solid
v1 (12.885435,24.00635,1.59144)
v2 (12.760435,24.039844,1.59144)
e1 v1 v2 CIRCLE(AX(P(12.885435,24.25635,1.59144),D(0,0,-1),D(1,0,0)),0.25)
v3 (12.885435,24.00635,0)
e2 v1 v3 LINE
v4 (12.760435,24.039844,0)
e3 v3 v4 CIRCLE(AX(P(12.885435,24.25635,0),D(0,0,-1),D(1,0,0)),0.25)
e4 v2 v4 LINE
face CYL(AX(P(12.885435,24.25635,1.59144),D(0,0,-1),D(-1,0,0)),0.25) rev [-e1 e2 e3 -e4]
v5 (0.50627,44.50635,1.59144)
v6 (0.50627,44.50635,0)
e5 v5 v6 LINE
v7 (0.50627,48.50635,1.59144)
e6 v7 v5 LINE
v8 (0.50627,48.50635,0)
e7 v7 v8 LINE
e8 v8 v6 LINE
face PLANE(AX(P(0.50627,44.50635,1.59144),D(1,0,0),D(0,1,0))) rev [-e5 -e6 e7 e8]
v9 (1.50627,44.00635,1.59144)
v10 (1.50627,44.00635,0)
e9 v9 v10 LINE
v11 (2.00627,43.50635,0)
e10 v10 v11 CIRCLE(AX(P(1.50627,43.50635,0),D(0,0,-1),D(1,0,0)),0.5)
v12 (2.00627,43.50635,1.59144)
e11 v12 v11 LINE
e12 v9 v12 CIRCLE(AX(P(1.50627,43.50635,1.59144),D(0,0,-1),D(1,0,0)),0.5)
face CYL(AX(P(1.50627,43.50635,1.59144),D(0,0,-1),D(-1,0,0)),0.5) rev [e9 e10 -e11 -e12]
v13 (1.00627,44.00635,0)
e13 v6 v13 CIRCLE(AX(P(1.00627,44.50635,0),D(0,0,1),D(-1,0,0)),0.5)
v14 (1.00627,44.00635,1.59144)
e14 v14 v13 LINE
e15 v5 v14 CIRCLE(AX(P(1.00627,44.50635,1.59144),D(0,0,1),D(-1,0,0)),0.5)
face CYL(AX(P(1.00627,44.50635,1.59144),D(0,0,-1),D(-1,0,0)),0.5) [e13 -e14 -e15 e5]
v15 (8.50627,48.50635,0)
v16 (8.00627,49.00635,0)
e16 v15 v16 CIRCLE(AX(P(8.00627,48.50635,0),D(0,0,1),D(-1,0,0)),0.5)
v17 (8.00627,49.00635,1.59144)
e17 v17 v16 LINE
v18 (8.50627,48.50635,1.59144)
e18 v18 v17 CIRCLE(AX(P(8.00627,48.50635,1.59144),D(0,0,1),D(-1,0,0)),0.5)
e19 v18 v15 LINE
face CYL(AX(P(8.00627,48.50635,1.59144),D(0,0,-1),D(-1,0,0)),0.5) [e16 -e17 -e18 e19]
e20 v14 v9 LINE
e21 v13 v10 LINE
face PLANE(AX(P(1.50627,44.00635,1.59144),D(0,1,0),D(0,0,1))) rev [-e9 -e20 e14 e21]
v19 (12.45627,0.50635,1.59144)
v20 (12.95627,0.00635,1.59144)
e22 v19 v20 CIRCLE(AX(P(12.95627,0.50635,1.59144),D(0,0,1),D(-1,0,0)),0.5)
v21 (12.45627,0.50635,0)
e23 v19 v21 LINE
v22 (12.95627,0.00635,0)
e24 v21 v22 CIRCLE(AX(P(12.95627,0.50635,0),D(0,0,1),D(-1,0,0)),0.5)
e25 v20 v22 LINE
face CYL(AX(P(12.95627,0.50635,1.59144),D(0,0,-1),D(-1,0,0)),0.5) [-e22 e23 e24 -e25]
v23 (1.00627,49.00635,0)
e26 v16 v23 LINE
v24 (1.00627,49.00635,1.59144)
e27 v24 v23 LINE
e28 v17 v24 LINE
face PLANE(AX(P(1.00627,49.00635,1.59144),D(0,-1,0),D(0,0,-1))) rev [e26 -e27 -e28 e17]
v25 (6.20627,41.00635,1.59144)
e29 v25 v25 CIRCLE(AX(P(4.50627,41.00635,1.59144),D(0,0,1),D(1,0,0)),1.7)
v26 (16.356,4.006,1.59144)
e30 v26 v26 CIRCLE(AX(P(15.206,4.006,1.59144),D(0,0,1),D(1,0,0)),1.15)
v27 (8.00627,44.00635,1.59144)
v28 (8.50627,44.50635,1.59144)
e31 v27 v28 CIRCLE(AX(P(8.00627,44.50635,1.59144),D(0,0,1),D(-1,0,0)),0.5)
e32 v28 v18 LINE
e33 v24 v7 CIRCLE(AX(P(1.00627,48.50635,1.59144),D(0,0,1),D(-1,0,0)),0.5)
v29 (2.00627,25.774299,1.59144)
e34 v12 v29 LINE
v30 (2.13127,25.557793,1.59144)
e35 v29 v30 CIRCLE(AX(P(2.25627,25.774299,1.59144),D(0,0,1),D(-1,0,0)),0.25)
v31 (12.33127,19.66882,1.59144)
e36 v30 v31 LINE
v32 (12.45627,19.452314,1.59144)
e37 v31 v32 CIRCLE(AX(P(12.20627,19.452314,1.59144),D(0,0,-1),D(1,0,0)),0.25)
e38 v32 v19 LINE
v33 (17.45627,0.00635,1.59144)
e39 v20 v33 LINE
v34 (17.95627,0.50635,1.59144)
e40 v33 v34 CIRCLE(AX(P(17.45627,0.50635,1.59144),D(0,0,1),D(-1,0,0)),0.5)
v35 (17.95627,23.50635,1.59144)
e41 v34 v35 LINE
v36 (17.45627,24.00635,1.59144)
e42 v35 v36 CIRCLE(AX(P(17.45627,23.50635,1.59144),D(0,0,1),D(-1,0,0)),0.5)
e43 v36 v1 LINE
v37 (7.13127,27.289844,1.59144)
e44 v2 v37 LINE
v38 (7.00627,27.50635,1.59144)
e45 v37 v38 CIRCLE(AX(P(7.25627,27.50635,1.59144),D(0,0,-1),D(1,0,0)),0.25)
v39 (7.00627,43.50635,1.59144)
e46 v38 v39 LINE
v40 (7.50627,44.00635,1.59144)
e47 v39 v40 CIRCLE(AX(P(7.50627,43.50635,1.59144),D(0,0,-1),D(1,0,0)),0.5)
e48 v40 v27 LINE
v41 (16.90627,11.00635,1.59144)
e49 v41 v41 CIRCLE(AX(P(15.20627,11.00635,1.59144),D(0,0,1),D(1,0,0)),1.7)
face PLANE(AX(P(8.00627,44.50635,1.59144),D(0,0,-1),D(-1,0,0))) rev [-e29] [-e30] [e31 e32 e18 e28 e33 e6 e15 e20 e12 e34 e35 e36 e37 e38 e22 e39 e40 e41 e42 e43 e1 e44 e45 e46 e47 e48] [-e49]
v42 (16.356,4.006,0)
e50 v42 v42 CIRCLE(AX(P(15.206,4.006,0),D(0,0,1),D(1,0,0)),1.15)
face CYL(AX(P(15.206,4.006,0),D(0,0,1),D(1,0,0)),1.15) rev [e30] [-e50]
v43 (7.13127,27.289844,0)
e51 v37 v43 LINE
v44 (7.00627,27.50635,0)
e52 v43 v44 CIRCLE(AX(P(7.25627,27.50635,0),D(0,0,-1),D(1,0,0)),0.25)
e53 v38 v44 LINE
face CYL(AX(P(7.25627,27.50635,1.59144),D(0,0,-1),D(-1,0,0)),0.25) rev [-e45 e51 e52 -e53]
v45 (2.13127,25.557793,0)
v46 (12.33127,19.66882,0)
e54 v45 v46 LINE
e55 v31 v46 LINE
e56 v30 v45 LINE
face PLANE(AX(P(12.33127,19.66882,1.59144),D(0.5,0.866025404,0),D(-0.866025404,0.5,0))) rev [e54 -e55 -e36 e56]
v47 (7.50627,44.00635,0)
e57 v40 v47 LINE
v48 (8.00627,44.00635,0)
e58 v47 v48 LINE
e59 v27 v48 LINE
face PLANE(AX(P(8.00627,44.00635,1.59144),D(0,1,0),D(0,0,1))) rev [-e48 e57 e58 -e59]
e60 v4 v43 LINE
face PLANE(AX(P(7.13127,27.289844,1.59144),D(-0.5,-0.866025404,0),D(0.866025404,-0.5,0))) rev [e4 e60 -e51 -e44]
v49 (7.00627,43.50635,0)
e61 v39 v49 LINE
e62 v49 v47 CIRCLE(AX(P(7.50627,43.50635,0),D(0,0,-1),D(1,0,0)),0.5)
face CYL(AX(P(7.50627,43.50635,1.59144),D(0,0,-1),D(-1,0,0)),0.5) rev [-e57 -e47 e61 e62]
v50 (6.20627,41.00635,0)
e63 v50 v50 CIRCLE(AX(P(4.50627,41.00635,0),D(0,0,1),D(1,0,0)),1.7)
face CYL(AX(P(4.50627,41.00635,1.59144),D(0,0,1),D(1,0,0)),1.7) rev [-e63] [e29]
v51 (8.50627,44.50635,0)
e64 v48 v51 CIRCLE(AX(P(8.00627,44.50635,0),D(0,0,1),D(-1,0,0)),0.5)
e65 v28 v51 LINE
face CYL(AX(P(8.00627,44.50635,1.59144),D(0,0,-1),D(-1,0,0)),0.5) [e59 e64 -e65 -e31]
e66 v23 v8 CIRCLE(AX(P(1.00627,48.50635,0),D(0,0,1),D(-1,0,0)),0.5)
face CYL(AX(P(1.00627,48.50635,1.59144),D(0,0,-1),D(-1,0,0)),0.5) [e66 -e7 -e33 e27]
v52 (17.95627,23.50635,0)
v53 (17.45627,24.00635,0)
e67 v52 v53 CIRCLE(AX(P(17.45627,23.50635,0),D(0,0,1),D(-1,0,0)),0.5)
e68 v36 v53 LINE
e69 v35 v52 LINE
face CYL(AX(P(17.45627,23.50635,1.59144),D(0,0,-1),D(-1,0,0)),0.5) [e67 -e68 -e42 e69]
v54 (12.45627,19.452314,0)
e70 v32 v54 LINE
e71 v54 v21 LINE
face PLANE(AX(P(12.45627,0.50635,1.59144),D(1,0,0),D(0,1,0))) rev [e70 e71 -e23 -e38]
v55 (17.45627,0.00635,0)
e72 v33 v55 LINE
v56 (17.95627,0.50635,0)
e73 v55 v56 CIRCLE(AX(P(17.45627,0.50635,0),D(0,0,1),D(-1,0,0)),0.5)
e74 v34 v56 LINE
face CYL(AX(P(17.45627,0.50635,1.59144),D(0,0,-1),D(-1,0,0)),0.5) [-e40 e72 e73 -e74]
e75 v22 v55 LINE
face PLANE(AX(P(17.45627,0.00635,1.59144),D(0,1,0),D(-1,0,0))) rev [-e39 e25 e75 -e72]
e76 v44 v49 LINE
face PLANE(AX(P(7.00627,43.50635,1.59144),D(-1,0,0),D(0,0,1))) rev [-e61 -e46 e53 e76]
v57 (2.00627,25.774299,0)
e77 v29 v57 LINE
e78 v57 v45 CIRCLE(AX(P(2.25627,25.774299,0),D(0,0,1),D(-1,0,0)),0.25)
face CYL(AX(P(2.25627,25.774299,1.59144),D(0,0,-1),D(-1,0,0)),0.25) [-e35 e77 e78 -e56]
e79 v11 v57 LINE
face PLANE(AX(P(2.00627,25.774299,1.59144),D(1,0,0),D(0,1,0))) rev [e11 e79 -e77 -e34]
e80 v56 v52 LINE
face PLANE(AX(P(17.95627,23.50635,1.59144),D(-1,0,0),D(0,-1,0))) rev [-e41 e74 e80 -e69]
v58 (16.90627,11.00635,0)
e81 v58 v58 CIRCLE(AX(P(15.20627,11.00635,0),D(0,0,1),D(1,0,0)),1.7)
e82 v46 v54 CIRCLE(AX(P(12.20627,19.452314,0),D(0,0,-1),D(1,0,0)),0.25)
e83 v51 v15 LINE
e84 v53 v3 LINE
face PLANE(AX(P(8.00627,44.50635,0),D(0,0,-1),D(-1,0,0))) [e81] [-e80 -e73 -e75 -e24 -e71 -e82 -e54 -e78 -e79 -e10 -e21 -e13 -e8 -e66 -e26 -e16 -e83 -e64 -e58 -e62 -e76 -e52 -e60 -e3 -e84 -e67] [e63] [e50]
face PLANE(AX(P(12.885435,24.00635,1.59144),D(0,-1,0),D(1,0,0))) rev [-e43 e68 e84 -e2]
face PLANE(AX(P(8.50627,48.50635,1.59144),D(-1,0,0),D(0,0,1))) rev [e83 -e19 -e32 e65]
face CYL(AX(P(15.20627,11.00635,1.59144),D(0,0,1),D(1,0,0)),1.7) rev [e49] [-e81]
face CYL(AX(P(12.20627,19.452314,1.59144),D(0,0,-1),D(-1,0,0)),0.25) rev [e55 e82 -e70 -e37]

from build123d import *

# Parameters (mm, degrees)
BOARD_DEPTH                  = 1.59144
M3_CLEARANCE_HOLE1_OUTLINE_R = 1.7
M3_CLEARANCE_HOLE1_DEPTH     = 1.59144
SKETCH7_R                    = 1.15
CUTOUT_2_DEPTH               = 53.216689419


# Read off the part's stored shape, not the designer's step: M3 Clearance Hole1
with BuildPart() as part:
    # Sketch1 → Board (new body)
    with BuildSketch(Plane.XY):
        with BuildLine():
            Line((8.00627, 44.00635), (7.50627, 44.00635))
            ThreePointArc((7.50627, 44.00635), (7.152716609, 43.859903391), (7.00627, 43.50635))
            Line((7.00627, 43.50635), (7.00627, 27.50635))
            ThreePointArc((7.00627, 27.50635), (7.039763649, 27.38135), (7.13127, 27.289843649))
            Line((7.13127, 27.289843649), (12.760435125, 24.039843649))
            ThreePointArc((12.760435125, 24.039843649), (12.820730363, 24.014868543), (12.885435125, 24.00635))
            Line((12.885435125, 24.00635), (17.45627, 24.00635))
            ThreePointArc((17.45627, 24.00635), (17.809823391, 23.859903391), (17.95627, 23.50635))
            Line((17.95627, 23.50635), (17.95627, 0.50635))
            ThreePointArc((17.95627, 0.50635), (17.809823391, 0.152796609), (17.45627, 0.00635))
            Line((17.45627, 0.00635), (12.95627, 0.00635))
            ThreePointArc((12.95627, 0.00635), (12.602716609, 0.152796609), (12.45627, 0.50635))
            Line((12.45627, 0.50635), (12.45627, 19.452313745))
            ThreePointArc((12.45627, 19.452313745), (12.422776351, 19.577313745), (12.33127, 19.668820096))
            Line((12.33127, 19.668820096), (2.13127, 25.557792841))
            ThreePointArc((2.13127, 25.557792841), (2.039763649, 25.649299192), (2.00627, 25.774299192))
            Line((2.00627, 25.774299192), (2.00627, 43.50635))
            ThreePointArc((2.00627, 43.50635), (1.859823391, 43.859903391), (1.50627, 44.00635))
            Line((1.50627, 44.00635), (1.00627, 44.00635))
            ThreePointArc((1.00627, 44.00635), (0.652716609, 44.152796609), (0.50627, 44.50635))
            Line((0.50627, 44.50635), (0.50627, 48.50635))
            ThreePointArc((0.50627, 48.50635), (0.652716609, 48.859903391), (1.00627, 49.00635))
            Line((1.00627, 49.00635), (8.00627, 49.00635))
            ThreePointArc((8.00627, 49.00635), (8.359823391, 48.859903391), (8.50627, 48.50635))
            Line((8.50627, 48.50635), (8.50627, 44.50635))
            ThreePointArc((8.50627, 44.50635), (8.359823391, 44.152796609), (8.00627, 44.00635))
        make_face()
    extrude(amount=BOARD_DEPTH)

    # M3 Clearance Hole1 outline → M3 Clearance Hole1 (cut)
    with BuildSketch(Plane.XY):
        with Locations((15.20627, 11.00635)):
            Circle(M3_CLEARANCE_HOLE1_OUTLINE_R)
        with Locations((4.50627, 41.00635)):
            Circle(M3_CLEARANCE_HOLE1_OUTLINE_R)
    extrude(amount=M3_CLEARANCE_HOLE1_DEPTH, mode=Mode.SUBTRACT)

    # Sketch7 → Cutout 2 (cut, through all)
    with BuildSketch(Plane.XY.offset(1.59144)):
        with Locations((15.206, 4.006)):
            Circle(SKETCH7_R)
    extrude(amount=-CUTOUT_2_DEPTH, mode=Mode.SUBTRACT)


solid = part.part
